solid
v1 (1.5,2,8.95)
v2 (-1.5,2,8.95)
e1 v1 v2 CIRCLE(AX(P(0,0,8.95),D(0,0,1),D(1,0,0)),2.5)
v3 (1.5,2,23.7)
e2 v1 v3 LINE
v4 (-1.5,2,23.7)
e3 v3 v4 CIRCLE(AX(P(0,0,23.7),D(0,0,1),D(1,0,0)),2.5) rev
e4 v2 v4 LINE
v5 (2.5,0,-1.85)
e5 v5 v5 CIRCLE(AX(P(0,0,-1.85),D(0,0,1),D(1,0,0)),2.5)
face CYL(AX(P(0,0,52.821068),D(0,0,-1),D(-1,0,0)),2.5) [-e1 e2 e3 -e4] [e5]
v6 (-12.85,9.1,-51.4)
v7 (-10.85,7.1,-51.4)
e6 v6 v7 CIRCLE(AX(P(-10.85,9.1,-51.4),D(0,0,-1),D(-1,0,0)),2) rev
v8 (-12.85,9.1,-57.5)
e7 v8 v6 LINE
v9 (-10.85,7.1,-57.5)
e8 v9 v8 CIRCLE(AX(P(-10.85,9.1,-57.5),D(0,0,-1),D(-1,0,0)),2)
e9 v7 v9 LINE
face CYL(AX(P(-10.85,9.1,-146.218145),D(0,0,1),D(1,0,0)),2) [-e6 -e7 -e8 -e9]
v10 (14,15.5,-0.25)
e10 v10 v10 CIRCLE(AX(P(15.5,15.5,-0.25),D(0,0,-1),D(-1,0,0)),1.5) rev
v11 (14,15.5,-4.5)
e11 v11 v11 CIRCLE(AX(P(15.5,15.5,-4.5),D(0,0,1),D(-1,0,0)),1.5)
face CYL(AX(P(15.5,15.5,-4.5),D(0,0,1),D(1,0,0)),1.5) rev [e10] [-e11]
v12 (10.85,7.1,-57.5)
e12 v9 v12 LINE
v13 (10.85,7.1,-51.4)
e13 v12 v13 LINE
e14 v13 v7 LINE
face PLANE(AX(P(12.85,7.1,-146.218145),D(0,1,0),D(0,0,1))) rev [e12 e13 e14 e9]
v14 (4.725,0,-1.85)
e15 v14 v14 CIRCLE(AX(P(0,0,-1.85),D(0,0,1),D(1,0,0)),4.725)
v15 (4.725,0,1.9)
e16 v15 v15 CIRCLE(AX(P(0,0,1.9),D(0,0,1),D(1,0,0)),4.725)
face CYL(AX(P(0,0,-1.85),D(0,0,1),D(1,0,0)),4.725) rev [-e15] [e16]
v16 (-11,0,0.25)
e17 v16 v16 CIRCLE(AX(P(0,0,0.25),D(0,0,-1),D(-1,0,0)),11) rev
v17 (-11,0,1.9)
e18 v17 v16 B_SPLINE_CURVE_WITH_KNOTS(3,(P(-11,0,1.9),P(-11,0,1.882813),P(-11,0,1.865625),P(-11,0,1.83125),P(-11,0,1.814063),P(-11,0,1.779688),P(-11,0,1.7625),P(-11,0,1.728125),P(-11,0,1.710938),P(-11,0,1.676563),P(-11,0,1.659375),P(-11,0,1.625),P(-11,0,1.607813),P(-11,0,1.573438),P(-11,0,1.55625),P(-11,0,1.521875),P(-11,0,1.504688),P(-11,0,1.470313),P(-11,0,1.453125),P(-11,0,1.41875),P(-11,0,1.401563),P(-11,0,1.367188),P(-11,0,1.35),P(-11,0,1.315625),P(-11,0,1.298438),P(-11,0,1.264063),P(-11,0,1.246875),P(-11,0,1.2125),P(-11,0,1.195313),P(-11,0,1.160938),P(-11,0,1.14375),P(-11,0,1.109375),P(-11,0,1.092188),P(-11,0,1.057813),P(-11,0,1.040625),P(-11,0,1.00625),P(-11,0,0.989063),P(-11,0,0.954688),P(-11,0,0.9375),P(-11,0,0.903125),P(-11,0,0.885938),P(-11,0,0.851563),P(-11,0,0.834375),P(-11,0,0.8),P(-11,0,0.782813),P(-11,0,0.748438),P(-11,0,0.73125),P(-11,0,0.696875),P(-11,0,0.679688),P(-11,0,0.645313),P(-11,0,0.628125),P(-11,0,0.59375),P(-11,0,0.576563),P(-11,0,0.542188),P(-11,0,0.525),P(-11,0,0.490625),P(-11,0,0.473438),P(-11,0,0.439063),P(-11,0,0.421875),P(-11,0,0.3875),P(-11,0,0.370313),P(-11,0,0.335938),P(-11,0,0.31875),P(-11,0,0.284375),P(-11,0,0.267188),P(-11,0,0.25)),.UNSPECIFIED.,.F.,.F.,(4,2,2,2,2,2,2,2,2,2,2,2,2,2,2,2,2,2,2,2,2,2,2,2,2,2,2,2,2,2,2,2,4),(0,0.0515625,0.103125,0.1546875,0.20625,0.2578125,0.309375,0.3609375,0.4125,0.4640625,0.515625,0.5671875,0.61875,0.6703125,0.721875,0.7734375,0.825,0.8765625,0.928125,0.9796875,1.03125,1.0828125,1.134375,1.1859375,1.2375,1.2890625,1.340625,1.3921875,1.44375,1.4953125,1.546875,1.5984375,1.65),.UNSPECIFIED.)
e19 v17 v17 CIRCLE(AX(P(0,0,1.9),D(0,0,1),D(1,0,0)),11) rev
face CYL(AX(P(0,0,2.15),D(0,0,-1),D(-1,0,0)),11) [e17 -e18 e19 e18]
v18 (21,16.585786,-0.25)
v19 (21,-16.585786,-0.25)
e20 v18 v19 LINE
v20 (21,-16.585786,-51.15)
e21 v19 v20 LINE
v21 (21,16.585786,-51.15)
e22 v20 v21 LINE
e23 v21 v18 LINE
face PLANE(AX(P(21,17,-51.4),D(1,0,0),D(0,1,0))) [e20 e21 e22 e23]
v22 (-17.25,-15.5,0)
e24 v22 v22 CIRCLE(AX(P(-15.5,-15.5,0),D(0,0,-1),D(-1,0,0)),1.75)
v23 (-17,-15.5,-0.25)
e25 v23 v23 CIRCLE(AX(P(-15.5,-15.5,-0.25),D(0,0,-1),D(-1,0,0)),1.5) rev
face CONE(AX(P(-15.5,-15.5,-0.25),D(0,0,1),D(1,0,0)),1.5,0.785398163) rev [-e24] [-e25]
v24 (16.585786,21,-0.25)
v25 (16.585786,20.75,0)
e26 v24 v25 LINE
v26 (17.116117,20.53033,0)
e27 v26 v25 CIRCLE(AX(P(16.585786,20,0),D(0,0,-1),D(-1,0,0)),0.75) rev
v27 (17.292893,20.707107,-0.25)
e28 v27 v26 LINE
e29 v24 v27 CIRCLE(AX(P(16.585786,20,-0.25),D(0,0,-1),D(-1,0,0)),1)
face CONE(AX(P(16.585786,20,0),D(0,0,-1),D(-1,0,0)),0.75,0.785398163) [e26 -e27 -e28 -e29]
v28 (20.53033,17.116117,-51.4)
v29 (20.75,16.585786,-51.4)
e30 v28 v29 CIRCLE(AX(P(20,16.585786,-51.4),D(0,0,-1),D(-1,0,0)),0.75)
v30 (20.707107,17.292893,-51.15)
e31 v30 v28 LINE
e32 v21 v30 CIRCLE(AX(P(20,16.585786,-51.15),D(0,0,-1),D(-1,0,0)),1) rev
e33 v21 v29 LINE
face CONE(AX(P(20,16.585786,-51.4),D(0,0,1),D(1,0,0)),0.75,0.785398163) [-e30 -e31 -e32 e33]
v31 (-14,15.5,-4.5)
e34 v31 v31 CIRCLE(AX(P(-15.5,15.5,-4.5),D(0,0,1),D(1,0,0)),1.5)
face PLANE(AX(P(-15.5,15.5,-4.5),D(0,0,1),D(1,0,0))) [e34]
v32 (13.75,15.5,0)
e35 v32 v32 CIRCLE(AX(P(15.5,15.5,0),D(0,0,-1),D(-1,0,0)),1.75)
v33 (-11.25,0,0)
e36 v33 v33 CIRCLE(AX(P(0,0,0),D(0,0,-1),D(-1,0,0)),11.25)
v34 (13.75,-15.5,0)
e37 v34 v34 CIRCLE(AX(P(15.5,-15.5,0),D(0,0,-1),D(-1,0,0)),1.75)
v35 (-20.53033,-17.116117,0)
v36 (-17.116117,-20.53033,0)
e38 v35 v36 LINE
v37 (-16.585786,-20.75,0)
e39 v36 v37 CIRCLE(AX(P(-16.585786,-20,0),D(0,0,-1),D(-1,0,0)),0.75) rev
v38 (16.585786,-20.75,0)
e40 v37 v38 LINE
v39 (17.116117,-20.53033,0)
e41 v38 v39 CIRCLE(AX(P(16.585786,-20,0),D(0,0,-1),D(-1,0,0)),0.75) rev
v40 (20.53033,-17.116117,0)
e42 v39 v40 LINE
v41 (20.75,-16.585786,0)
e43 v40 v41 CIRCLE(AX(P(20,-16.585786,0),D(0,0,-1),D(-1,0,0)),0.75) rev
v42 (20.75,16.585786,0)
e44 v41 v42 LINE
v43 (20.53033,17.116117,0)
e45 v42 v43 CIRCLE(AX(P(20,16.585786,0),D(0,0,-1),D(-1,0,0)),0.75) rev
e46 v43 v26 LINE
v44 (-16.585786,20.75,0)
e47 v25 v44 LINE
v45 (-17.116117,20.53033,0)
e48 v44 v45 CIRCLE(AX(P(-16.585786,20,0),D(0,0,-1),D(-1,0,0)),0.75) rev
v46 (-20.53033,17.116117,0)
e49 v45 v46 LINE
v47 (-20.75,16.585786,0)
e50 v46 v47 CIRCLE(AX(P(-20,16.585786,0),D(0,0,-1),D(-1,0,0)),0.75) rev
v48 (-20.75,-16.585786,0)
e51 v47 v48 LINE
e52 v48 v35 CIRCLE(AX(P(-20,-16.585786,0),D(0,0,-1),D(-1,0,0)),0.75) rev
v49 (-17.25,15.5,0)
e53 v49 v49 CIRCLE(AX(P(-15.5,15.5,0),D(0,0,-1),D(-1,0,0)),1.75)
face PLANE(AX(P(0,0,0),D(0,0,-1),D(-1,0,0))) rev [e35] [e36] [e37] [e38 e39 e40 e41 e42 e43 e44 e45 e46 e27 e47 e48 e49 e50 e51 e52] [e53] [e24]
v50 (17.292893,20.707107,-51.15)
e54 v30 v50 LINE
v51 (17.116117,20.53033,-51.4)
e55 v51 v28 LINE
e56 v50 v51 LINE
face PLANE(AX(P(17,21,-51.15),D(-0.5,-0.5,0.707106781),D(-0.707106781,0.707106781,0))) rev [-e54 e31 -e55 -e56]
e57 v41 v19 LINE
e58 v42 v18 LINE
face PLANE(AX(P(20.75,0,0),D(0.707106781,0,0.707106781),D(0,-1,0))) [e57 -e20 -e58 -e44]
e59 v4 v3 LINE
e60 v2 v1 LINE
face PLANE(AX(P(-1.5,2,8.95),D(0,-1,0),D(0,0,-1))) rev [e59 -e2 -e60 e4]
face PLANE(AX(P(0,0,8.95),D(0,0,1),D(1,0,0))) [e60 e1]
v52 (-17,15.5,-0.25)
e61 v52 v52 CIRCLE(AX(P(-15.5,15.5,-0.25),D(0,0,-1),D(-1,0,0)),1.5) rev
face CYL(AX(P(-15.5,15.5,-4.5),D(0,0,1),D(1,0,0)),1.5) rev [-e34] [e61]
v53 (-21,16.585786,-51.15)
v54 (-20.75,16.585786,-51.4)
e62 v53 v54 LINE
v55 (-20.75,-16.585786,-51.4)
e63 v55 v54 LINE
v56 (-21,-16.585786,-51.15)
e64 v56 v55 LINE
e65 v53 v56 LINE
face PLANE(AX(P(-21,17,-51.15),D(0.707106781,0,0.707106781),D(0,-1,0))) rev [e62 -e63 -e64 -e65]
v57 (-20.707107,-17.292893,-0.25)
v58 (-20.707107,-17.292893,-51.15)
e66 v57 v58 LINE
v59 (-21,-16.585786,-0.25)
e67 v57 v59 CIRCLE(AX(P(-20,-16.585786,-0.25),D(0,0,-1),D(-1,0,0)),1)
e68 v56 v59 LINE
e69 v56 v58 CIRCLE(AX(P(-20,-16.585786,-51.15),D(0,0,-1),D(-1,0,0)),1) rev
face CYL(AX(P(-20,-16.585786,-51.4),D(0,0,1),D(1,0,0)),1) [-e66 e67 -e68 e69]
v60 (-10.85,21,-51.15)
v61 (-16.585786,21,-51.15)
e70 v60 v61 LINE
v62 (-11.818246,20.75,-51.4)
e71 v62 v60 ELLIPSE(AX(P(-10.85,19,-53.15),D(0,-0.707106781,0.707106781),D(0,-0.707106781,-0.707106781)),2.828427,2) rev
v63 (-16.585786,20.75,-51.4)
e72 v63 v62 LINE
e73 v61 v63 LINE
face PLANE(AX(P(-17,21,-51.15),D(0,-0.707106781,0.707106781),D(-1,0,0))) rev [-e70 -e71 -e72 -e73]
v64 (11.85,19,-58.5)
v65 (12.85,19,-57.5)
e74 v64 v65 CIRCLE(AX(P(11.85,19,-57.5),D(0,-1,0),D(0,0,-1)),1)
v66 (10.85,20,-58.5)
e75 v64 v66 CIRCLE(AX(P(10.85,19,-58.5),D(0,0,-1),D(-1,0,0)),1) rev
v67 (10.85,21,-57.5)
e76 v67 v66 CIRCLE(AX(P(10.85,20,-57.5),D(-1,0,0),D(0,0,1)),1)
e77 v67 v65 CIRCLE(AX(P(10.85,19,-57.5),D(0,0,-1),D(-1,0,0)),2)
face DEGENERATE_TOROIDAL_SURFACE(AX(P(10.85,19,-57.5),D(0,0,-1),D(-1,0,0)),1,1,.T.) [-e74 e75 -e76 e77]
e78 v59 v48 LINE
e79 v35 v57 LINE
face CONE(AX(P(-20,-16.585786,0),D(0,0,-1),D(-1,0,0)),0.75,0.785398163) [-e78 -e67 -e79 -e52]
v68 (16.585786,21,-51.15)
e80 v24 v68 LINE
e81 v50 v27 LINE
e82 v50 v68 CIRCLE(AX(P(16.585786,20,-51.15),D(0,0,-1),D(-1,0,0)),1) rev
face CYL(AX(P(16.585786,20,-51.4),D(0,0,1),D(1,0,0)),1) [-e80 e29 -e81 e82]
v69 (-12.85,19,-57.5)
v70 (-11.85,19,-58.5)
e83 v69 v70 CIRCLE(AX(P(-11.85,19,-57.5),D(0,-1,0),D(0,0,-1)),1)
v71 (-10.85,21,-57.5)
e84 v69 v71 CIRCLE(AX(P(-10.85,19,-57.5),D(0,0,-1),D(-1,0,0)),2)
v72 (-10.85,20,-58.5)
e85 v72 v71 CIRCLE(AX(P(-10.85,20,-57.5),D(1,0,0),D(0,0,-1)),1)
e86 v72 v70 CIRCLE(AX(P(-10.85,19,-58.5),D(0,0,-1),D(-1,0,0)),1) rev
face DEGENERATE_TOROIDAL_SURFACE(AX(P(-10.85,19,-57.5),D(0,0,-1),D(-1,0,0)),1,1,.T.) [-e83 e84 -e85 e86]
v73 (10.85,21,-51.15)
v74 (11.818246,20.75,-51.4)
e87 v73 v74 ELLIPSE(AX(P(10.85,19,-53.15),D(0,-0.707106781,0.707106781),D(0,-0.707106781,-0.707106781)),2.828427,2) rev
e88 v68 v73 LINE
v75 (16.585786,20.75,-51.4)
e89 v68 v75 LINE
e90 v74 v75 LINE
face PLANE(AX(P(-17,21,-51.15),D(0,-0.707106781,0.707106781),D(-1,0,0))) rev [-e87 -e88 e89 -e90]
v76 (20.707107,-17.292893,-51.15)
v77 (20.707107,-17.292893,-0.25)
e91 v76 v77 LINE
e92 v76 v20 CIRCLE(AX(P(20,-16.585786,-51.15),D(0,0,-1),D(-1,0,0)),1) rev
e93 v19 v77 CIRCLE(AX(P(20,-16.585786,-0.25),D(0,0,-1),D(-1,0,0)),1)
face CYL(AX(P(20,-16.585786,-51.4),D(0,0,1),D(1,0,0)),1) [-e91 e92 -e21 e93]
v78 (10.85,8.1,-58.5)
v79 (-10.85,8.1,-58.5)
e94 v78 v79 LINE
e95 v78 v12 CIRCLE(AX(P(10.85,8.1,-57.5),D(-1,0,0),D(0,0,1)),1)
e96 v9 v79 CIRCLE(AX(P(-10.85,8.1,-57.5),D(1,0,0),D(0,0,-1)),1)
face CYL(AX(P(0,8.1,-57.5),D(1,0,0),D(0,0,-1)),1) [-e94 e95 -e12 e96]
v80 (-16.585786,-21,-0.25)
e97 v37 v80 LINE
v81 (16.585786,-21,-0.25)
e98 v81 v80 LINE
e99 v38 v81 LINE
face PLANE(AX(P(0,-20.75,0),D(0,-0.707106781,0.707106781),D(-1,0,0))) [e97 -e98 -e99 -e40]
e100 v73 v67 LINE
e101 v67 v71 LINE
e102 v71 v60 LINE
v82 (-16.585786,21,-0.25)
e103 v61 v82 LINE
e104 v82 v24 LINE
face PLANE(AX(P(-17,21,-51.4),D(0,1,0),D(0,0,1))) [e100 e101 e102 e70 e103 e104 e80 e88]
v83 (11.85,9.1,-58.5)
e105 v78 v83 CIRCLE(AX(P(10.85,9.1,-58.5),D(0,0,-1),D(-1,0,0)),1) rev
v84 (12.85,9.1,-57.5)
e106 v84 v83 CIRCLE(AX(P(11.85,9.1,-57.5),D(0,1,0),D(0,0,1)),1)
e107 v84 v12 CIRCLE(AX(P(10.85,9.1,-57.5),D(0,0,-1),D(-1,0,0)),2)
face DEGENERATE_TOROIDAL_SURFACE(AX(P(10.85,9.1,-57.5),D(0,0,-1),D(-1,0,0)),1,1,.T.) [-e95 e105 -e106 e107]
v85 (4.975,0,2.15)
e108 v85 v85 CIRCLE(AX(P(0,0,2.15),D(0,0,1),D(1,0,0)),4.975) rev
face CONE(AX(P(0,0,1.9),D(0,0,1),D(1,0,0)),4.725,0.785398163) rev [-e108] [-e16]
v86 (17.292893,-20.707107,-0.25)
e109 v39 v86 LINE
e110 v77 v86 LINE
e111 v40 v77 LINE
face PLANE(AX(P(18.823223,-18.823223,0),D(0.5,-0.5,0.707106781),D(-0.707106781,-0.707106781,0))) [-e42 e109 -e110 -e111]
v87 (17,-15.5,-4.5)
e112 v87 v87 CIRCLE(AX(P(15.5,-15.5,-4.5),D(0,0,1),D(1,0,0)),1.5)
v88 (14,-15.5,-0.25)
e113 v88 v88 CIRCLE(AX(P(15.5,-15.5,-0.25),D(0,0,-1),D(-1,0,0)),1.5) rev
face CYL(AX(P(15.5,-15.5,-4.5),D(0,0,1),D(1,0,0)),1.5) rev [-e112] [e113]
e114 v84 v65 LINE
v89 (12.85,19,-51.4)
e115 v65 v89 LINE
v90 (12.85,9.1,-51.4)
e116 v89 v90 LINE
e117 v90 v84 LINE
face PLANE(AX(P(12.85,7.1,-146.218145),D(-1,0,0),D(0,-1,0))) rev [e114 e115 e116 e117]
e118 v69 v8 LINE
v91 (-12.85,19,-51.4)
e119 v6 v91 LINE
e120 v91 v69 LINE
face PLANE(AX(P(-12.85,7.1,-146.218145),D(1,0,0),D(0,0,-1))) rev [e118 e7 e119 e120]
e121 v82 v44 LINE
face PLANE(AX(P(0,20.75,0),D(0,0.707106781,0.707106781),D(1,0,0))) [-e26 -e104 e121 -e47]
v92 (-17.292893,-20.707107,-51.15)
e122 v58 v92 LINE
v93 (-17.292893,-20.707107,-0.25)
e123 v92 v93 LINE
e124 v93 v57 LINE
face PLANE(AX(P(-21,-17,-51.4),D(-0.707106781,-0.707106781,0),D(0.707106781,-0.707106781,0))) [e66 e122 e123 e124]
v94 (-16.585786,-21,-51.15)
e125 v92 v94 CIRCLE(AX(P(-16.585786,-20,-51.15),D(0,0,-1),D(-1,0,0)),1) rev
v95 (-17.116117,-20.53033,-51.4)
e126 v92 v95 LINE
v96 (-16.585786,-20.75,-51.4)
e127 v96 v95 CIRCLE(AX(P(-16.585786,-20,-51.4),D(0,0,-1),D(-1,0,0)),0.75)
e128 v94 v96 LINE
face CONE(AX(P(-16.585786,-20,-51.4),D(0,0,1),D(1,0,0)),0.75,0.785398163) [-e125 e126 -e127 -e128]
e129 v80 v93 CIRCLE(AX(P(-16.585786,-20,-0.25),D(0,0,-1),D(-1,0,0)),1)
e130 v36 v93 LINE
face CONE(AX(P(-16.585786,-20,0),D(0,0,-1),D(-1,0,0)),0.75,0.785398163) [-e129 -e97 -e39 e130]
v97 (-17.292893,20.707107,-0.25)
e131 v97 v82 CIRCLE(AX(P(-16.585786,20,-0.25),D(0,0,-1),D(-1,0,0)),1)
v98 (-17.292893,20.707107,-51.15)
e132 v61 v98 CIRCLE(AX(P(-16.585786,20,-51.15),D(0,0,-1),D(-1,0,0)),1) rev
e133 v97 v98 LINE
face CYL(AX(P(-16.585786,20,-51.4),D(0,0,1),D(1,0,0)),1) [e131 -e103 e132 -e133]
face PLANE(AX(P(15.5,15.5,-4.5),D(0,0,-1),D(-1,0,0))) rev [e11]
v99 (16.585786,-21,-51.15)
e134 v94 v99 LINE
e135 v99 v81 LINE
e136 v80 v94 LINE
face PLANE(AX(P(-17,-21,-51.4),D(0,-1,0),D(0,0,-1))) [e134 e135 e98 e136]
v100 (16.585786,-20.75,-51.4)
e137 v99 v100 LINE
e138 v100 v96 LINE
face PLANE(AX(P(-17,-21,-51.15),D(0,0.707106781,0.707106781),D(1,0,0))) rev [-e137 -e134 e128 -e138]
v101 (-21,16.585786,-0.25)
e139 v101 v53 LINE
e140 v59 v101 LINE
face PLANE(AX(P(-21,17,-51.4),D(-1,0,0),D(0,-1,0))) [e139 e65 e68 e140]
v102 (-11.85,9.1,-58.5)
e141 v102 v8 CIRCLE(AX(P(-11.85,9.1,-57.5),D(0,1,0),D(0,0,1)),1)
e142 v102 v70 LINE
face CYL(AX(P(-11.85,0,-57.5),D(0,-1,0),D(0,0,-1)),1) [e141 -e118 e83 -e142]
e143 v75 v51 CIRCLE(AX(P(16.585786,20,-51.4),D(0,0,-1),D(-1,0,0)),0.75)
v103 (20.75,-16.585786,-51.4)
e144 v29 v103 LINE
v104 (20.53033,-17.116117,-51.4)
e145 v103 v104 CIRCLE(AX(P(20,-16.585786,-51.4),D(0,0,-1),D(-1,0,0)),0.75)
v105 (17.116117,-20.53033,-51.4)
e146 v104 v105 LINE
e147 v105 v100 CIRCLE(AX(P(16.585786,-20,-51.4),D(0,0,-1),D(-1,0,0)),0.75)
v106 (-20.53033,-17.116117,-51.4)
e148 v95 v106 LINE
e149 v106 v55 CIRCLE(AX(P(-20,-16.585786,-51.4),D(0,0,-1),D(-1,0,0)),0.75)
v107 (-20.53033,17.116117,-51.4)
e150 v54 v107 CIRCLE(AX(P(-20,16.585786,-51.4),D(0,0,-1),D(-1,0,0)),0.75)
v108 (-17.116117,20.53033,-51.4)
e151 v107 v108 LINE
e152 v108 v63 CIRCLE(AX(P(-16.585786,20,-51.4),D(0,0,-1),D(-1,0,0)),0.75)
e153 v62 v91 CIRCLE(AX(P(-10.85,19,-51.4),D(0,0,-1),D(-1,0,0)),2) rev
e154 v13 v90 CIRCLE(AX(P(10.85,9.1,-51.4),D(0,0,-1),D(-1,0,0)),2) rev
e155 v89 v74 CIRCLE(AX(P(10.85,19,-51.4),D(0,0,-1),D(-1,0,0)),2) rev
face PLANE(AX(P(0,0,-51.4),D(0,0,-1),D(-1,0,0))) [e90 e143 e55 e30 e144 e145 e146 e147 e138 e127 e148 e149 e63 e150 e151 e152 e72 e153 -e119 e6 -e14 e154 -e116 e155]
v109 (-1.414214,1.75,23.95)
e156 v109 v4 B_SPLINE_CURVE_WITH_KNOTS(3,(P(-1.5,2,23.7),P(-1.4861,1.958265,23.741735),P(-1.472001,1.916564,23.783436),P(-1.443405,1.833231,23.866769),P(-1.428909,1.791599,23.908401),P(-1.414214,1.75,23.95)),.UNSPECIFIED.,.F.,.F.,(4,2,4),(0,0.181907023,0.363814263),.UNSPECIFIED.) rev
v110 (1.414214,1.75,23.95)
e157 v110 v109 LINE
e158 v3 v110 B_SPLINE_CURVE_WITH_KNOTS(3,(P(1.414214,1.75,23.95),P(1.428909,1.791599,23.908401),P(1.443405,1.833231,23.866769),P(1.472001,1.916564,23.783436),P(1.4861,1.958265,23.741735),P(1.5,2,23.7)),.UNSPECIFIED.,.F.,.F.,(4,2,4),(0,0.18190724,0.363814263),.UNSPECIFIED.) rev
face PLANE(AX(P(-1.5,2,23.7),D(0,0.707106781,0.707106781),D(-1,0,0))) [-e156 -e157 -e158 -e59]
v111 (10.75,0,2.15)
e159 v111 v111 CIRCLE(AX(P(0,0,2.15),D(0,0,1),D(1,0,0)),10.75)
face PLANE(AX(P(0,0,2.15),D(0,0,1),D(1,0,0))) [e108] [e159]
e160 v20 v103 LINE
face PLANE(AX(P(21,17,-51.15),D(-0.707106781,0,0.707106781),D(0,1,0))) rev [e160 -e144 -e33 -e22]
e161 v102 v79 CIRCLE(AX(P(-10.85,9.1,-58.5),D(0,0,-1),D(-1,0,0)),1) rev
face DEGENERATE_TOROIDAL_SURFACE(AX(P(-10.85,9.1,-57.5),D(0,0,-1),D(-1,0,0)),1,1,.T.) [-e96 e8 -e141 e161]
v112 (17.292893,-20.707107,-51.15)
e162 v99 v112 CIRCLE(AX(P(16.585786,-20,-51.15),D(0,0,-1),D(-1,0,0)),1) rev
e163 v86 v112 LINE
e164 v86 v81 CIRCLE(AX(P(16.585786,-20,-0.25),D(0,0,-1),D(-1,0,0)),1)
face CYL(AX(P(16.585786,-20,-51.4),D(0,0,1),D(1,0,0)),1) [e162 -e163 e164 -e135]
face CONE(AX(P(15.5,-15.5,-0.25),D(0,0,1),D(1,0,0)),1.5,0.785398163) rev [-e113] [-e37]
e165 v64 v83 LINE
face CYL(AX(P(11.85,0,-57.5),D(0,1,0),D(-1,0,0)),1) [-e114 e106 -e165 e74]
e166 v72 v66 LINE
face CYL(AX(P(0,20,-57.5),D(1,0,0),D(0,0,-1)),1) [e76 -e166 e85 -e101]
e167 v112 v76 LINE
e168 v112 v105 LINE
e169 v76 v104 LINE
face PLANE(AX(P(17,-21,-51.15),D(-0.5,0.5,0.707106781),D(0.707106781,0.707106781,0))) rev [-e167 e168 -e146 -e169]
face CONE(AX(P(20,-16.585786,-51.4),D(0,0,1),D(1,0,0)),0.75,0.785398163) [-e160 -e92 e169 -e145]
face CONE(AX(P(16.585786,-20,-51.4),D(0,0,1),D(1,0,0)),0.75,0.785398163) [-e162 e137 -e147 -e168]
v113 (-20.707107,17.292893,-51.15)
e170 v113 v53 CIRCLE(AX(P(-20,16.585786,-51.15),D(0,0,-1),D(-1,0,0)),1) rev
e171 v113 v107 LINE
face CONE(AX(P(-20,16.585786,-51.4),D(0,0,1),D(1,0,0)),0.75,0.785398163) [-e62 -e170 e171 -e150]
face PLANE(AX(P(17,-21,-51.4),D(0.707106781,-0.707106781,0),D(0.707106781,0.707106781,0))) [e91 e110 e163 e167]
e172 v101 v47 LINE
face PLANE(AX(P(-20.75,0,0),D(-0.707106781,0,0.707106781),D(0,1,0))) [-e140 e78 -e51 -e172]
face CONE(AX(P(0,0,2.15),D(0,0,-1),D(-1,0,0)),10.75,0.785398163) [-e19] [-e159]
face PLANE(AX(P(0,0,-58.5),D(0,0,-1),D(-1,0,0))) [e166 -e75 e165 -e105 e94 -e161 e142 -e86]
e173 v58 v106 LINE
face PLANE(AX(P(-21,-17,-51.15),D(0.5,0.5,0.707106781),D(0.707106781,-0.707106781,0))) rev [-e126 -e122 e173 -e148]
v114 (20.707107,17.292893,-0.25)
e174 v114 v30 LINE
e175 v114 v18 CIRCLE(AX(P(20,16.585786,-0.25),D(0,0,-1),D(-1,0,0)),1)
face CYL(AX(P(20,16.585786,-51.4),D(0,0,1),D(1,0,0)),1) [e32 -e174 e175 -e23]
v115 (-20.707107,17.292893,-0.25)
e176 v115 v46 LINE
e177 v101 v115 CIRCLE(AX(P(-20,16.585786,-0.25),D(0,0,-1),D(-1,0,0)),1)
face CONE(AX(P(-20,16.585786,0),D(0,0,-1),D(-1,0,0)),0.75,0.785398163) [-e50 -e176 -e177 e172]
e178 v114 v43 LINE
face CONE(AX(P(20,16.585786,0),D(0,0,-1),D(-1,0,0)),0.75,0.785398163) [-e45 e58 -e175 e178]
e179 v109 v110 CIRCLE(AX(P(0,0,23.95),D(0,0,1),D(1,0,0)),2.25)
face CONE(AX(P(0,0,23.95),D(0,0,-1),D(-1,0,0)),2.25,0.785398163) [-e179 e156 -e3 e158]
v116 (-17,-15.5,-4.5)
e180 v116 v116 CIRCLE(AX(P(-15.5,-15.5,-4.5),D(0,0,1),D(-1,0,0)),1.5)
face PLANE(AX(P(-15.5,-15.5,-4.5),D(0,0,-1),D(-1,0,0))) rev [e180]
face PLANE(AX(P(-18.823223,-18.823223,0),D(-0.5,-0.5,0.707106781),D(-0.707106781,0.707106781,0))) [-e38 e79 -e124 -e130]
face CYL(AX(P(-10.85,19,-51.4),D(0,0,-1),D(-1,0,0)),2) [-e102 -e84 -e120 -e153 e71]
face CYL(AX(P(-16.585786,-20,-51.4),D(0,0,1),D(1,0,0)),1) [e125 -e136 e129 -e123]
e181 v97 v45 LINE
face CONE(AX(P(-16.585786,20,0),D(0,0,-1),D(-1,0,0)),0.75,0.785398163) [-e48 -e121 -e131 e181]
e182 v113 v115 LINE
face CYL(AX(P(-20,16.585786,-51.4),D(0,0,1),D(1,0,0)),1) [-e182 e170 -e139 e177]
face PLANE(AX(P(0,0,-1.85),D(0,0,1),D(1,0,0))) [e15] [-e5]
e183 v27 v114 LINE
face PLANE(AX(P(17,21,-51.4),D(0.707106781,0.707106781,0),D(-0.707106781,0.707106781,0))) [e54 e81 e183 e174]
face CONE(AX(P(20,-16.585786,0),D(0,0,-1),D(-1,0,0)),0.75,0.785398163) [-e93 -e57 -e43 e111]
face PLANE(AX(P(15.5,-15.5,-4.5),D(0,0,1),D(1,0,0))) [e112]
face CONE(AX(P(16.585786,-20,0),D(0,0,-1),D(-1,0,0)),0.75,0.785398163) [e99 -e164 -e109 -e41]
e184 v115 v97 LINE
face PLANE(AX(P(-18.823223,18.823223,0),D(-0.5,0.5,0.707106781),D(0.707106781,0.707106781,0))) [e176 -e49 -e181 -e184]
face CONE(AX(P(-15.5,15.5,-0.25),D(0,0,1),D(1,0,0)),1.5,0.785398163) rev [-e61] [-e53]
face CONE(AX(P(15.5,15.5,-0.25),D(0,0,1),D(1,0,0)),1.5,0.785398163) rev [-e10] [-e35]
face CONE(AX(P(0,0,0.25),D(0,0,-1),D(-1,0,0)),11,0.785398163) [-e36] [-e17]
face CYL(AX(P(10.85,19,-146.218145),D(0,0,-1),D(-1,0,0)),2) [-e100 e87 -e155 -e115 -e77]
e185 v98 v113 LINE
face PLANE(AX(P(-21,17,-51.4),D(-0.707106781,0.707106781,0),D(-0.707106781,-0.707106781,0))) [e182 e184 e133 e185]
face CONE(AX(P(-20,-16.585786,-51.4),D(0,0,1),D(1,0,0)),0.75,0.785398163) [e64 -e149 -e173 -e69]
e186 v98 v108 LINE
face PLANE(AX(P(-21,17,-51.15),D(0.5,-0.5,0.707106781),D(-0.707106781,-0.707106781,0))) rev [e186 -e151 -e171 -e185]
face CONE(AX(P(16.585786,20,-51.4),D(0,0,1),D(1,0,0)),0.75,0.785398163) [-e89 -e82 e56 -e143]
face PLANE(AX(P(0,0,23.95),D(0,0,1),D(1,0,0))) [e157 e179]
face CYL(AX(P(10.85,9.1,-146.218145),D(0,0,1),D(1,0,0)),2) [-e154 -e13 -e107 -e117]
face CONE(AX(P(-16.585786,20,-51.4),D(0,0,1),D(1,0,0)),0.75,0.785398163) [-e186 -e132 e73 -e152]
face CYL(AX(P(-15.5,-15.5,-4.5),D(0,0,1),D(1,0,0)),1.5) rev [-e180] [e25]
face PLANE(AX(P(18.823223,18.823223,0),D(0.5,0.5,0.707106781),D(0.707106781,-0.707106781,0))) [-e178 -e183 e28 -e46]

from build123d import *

# Parameters (mm, degrees)
BOSS_EXTRUDE1_DEPTH = 51.4
SKETCH2_R           = 1.5
CUT_EXTRUDE1_DEPTH  = 4.5
SKETCH3_R           = 11
BOSS_EXTRUDE2_DEPTH = 2.15
SKETCH5_R           = 4.725
CUT_EXTRUDE2_DEPTH  = 4
SKETCH4_R           = 2.5
BOSS_EXTRUDE3_DEPTH = 25.8
CUT_EXTRUDE3_START  = -15
CUT_EXTRUDE3_DEPTH  = 15
SKETCH7_W           = 25.7
SKETCH7_H           = 13.9
BOSS_EXTRUDE4_DEPTH = 7.1
FILLET1_R           = 1
FILLET2_R           = 2
CHAMFER1_SIZE       = 0.25


with BuildPart() as part:
    # Sketch1 → Boss-Extrude1 (new body)
    with BuildSketch(Plane.XY):
        Polygon((-21, 17), (-17, 21), (17, 21), (21, 17), (21, -17), (17, -21), (-17, -21), (-21, -17), align=None)
    extrude(amount=-BOSS_EXTRUDE1_DEPTH)

    # Sketch2 → Cut-Extrude1 (cut)
    with BuildSketch(Plane.XY):
        with Locations((-15.5, 15.5)):
            Circle(SKETCH2_R)
        with Locations(Location((15.5, 15.5, 0), (0, 0, 180))):
            Circle(SKETCH2_R)
        with Locations((15.5, -15.5)):
            Circle(SKETCH2_R)
        with Locations(Location((-15.5, -15.5, 0), (0, 0, 180))):
            Circle(SKETCH2_R)
    extrude(amount=-CUT_EXTRUDE1_DEPTH, mode=Mode.SUBTRACT)

    # Sketch3 → Boss-Extrude2 (add)
    with BuildSketch(Plane.XY):
        with Locations(Location((0, 0, 0), (0, 0, 180))):
            Circle(SKETCH3_R)
    extrude(amount=BOSS_EXTRUDE2_DEPTH)

    # Sketch5 → Cut-Extrude2 (cut)
    with BuildSketch(Plane.XY.offset(2.15)):
        Circle(SKETCH5_R)
    extrude(amount=-CUT_EXTRUDE2_DEPTH, mode=Mode.SUBTRACT)

    # Sketch4 → Boss-Extrude3 (add)
    with BuildSketch(Plane.XY.offset(-1.85)):
        Circle(SKETCH4_R)
    extrude(amount=BOSS_EXTRUDE3_DEPTH)

    # Sketch6 → Cut-Extrude3 (cut)
    with BuildSketch(Plane.XY.offset(23.95).offset(CUT_EXTRUDE3_START)):
        with BuildLine():
            Line((-1.5, 2), (1.5, 2))
            ThreePointArc((1.5, 2), (0, 2.5), (-1.5, 2))
        make_face()
    extrude(amount=CUT_EXTRUDE3_DEPTH, mode=Mode.SUBTRACT)

    # Sketch7 → Boss-Extrude4 (add)
    with BuildSketch(Plane(origin=(0, 0, -51.4), x_dir=(-1, 0, 0), z_dir=(0, 0, -1))):
        with Locations((0, 14.05)):
            Rectangle(SKETCH7_W, SKETCH7_H)
    extrude(amount=BOSS_EXTRUDE4_DEPTH)

    # Fillet1
    fillet1_edges = [part.edges().sort_by_distance(p)[0] for p in [
        (17, 21, -25.7),
        (21, 17, -25.7),
        (21, -17, -25.7),
        (17, -21, -25.7),
        (-17, -21, -25.7),
        (-21, -17, -25.7),
        (-21, 17, -25.7),
        (-17, 21, -25.7),
        (0, 7.1, -58.5),
        (-12.85, 14.05, -58.5),
        (0, 21, -58.5),
        (12.85, 14.05, -58.5),
    ]]
    fillet(fillet1_edges, radius=FILLET1_R)

    # Fillet2
    # the kernel refuses this fillet: 2 mm, written as the material it takes off along each edge
    with BuildSketch(Plane(origin=(-10.85, 19, -58.5), x_dir=(-1, 0, 0), z_dir=(0, -1, 0))) as fillet2_piece_1:
        with BuildLine():
            CenterArc((1, -1), 1, 0, 90)
            Line((2, -1), (2, 0))
            Line((2, 0), (1, 0))
        make_face()
    revolve(axis=Axis((-10.85, 19, -58.5), (0, 0, -1)), revolution_arc=90, mode=Mode.SUBTRACT)
    with BuildSketch(Plane(origin=(-10.85, 9.1, -58.5), x_dir=(0, -1, 0), z_dir=(1, 0, 0))) as fillet2_piece_2:
        with BuildLine():
            CenterArc((1, -1), 1, 0, 90)
            Line((2, -1), (2, 0))
            Line((2, 0), (1, 0))
        make_face()
    revolve(axis=Axis((-10.85, 9.1, -58.5), (0, 0, -1)), revolution_arc=90, mode=Mode.SUBTRACT)
    with BuildSketch(Plane(origin=(10.85, 19, -58.5), x_dir=(0, 1, 0), z_dir=(-1, 0, 0))) as fillet2_piece_3:
        with BuildLine():
            CenterArc((1, -1), 1, 0, 90)
            Line((2, -1), (2, 0))
            Line((2, 0), (1, 0))
        make_face()
    revolve(axis=Axis((10.85, 19, -58.5), (0, 0, -1)), revolution_arc=90, mode=Mode.SUBTRACT)
    with BuildSketch(Plane(origin=(10.85, 9.1, -58.5), x_dir=(1, 0, 0), z_dir=(0, 1, 0))) as fillet2_piece_4:
        with BuildLine():
            CenterArc((1, -1), 1, 0, 90)
            Line((2, -1), (2, 0))
            Line((2, 0), (1, 0))
        make_face()
    revolve(axis=Axis((10.85, 9.1, -58.5), (0, 0, -1)), revolution_arc=90, mode=Mode.SUBTRACT)
    with BuildSketch(Plane(origin=(12.85, 21, -51.4), x_dir=(-1, 0, 0), z_dir=(0, 0, -1))) as fillet2_piece_5:
        with BuildLine():
            CenterArc((FILLET2_R, -FILLET2_R), FILLET2_R, 90, 90)
            Line((0, -FILLET2_R), (0, 0))
            Line((0, 0), (FILLET2_R, 0))
        make_face()
    extrude(amount=7.1, mode=Mode.SUBTRACT)
    with BuildSketch(Plane(origin=(12.85, 7.1, -51.4), x_dir=(-1, 0, 0), z_dir=(0, 0, -1)), Plane(origin=(-12.85, 21, -51.4), x_dir=(1, 0, 0), z_dir=(0, 0, -1)), Plane(origin=(-12.85, 7.1, -51.4), x_dir=(0, 1, 0), z_dir=(0, 0, -1))) as fillet2_piece_6:
        with BuildLine():
            CenterArc((FILLET2_R, FILLET2_R), FILLET2_R, 180, 90)
            Line((0, FILLET2_R), (0, 0))
            Line((0, 0), (FILLET2_R, 0))
        make_face()
    extrude(amount=7.1, mode=Mode.SUBTRACT)

    # Chamfer1
    chamfer1_edges = [part.edges().sort_by_distance(p)[0] for p in [
        (16.96846987, 20.923879533, 0),
        (21, 0, -51.4),
        (19, -19, -51.4),
        (0, -21, -51.4),
        (-19, -19, -51.4),
        (-21, 0, -51.4),
        (-19, 19, -51.4),
        (-20.923879533, 16.96846987, -51.4),
        (-16.96846987, 20.923879533, -51.4),
        (-20.923879533, -16.96846987, -51.4),
        (-16.96846987, -20.923879533, -51.4),
        (16.96846987, -20.923879533, -51.4),
        (20.923879533, -16.96846987, -51.4),
        (20.923879533, 16.96846987, -51.4),
        (16.96846987, 20.923879533, -51.4),
        (-14, -15.5, 0),
        (14, -15.5, 0),
        (17, 15.5, 0),
        (-17, 15.5, 0),
        (11, 0, 0),
        (11, 0, 2.15),
        (-4.725, 0, 2.15),
        (-1.118033989, -2.236067977, 23.95),
        (0, 2, 23.95),
        (-13.717893219, 21, -51.4),
        (0, 21, 0),
        (13.717893219, 21, -51.4),
        (19, 19, 0),
        (19, 19, -51.4),
        (-19, 19, 0),
        (-21, 0, 0),
        (-19, -19, 0),
        (0, -21, 0),
        (19, -19, 0),
        (21, 0, 0),
        (-20.923879533, 16.96846987, 0),
        (-16.96846987, 20.923879533, 0),
        (-20.923879533, -16.96846987, 0),
        (-16.96846987, -20.923879533, 0),
        (16.96846987, -20.923879533, 0),
        (20.923879533, -16.96846987, 0),
        (20.923879533, 16.96846987, 0),
    ]]
    chamfer(chamfer1_edges, length=CHAMFER1_SIZE)


solid = part.part
